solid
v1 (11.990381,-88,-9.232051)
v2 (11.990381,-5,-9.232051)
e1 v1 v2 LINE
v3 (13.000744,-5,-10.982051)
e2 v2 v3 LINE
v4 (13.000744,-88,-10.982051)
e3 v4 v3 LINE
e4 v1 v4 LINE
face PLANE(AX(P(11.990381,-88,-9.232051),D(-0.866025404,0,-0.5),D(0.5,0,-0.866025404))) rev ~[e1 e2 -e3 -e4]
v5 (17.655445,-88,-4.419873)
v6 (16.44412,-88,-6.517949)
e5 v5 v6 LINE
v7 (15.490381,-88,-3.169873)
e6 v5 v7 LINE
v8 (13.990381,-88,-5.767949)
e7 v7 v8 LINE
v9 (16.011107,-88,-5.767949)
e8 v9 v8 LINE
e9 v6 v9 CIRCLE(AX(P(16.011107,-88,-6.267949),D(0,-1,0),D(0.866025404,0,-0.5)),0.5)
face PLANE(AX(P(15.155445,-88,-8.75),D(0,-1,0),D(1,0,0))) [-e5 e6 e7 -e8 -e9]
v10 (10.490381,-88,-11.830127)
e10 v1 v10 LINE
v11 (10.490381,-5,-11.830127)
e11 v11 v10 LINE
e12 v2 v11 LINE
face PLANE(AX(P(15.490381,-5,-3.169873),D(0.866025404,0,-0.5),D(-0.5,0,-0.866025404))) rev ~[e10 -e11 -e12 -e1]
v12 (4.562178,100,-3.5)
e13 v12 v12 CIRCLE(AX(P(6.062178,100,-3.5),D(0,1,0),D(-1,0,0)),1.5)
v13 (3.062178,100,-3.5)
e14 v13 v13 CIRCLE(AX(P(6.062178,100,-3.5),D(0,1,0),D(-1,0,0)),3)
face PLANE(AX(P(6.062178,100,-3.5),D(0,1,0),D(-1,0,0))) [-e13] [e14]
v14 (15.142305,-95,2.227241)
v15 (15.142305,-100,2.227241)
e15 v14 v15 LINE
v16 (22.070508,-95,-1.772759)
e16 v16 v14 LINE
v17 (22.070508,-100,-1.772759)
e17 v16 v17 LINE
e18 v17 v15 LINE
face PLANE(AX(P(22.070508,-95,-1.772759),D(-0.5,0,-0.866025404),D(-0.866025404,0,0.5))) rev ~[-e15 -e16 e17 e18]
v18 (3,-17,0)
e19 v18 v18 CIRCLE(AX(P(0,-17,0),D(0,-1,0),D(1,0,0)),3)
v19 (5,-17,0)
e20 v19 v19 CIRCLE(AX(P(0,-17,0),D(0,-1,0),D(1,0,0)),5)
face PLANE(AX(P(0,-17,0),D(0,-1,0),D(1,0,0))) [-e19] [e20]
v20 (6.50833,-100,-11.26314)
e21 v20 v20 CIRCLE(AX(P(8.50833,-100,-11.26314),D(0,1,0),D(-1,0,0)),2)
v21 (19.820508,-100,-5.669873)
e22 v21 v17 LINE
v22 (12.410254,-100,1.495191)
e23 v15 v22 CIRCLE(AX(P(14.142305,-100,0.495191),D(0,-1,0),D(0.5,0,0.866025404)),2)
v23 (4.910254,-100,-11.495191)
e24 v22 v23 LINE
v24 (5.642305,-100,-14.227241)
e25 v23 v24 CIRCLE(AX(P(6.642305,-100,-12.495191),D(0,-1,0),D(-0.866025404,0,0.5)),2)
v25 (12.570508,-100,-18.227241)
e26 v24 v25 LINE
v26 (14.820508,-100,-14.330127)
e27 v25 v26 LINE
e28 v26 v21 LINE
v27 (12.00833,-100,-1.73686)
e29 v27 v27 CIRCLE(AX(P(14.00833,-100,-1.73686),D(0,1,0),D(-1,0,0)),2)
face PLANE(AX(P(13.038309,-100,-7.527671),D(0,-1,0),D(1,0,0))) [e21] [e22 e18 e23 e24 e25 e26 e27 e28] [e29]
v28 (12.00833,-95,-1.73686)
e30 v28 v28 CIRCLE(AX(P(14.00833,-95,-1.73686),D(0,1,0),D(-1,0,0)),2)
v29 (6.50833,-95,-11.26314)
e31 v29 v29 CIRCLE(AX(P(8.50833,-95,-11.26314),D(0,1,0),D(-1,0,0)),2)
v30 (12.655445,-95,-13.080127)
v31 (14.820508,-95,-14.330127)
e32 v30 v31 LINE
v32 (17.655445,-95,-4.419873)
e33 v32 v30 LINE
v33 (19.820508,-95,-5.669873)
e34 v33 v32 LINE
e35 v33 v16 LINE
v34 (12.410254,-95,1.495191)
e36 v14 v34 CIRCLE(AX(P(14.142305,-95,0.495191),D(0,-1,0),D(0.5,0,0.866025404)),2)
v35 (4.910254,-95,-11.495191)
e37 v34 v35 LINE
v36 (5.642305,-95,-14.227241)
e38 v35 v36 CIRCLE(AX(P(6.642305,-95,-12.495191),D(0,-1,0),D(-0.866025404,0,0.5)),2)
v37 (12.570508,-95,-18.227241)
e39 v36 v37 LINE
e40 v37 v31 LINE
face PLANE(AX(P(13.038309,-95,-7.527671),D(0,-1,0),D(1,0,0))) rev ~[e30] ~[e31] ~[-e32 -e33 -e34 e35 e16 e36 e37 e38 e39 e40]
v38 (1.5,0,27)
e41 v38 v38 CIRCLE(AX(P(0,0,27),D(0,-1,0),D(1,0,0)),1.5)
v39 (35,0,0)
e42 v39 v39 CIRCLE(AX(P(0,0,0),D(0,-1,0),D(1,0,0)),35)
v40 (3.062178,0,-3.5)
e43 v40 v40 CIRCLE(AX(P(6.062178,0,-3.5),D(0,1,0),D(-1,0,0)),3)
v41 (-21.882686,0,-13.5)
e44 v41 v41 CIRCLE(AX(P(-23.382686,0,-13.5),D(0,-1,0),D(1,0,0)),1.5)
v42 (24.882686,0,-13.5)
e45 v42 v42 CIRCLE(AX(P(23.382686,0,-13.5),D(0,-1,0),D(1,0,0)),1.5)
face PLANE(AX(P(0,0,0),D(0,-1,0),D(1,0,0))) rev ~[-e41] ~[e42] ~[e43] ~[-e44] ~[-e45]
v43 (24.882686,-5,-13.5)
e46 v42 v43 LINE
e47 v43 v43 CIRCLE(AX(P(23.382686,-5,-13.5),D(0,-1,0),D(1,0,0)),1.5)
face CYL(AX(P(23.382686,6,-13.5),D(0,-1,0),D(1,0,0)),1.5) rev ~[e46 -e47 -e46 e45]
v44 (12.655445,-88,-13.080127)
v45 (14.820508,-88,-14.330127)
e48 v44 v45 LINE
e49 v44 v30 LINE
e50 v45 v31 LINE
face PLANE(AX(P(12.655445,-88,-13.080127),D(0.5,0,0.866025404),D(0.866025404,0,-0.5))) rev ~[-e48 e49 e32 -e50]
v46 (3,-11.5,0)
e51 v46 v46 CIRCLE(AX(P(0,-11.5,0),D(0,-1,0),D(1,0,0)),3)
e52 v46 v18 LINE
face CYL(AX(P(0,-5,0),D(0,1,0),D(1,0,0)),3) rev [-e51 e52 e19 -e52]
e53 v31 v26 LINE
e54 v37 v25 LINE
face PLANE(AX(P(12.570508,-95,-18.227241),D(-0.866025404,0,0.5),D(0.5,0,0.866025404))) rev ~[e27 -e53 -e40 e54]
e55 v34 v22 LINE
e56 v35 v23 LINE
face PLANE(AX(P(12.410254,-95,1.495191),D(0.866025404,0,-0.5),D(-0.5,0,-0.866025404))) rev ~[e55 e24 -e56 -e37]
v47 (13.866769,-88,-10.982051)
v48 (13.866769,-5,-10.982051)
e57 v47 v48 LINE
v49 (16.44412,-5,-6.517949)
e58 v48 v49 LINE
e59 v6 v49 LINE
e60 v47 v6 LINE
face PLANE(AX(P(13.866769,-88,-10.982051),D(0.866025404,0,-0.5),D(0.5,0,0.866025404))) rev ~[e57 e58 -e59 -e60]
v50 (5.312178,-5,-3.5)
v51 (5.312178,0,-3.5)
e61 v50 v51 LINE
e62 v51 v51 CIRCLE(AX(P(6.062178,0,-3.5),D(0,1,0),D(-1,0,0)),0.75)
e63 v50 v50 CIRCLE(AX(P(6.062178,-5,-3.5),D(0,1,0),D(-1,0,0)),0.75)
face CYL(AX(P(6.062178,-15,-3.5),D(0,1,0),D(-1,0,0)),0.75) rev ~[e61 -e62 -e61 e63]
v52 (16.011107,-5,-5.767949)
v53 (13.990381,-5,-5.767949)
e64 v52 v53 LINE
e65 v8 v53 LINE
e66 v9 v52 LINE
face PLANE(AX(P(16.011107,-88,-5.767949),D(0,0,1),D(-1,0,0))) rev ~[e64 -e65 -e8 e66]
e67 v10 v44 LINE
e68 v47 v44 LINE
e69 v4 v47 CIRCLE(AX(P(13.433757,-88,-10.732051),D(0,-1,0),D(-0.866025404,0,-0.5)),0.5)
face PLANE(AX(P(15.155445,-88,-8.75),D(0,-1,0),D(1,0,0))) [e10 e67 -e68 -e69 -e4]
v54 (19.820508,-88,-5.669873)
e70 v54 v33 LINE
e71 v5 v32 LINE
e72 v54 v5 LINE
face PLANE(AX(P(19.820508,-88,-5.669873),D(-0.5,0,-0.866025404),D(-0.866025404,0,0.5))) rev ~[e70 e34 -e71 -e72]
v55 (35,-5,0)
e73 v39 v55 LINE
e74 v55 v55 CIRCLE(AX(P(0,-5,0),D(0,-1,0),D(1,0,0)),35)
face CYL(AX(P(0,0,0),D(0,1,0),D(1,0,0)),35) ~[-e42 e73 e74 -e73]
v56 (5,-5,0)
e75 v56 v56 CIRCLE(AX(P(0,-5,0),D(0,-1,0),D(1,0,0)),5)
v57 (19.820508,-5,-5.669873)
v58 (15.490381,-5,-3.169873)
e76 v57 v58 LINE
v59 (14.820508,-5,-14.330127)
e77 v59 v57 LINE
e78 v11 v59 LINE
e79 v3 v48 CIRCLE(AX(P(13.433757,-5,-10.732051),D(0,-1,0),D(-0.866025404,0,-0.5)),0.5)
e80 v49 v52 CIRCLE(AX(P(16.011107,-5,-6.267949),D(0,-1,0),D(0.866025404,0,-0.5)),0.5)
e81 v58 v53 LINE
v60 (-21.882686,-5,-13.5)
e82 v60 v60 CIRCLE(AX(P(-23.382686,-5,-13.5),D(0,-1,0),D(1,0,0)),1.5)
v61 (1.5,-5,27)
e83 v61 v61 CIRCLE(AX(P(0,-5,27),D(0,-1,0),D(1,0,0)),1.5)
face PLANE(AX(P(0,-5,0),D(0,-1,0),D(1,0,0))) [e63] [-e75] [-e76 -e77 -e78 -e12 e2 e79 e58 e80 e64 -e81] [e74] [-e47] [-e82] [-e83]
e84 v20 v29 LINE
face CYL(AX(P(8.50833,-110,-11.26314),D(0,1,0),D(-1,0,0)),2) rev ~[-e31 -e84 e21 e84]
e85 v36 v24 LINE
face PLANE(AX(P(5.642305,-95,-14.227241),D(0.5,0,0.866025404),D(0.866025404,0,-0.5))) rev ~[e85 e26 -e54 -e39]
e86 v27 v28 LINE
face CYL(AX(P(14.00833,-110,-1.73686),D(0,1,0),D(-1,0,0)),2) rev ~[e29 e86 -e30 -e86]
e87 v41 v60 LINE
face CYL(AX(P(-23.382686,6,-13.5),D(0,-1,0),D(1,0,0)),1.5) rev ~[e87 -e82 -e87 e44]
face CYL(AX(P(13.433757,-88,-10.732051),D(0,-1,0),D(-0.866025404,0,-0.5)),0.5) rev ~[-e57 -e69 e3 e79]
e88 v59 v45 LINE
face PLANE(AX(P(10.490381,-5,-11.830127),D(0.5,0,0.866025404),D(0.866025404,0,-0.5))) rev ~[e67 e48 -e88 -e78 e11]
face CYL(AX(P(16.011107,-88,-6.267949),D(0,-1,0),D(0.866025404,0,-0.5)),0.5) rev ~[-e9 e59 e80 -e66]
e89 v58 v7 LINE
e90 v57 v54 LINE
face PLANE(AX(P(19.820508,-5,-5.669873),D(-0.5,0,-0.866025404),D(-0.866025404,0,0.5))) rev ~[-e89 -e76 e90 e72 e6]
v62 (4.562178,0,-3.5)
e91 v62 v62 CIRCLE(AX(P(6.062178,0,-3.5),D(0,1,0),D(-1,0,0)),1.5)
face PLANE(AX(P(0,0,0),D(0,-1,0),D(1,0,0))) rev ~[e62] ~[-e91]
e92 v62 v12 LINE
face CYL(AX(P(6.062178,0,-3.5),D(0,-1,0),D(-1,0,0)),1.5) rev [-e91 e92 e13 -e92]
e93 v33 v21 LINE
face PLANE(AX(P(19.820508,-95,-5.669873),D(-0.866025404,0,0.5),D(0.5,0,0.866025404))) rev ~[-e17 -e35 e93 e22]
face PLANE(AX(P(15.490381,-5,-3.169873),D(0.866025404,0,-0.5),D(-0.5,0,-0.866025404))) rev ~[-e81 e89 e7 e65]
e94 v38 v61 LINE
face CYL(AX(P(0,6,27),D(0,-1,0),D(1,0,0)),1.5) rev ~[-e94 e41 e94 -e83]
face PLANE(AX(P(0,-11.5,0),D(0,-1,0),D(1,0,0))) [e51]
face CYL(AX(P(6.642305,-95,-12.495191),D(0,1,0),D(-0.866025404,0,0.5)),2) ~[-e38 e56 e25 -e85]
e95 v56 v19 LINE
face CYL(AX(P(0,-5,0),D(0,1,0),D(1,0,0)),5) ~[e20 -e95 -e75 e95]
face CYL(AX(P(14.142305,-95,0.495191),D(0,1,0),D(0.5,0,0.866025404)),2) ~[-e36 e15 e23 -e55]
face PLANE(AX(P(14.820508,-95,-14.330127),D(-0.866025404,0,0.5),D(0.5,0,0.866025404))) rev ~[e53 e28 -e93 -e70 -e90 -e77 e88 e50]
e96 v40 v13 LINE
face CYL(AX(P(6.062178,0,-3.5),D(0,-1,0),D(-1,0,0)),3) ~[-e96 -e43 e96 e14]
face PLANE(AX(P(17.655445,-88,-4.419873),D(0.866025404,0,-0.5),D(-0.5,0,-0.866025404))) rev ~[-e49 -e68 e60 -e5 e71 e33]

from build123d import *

# Parameters (mm, degrees)
F0_R      = 35
F1_DEPTH  = 5
F2_R      = 5
F2_R_2    = 3
F3_DEPTH  = 12
F5_DEPTH  = 83
F7_D      = 3
F7_DEPTH  = 6
F7_TIP    = 0.9012909285
F9_DEPTH  = 83
F10_R     = 3
F11_DEPTH = 6.5
F13_DEPTH = 7
F15_DEPTH = 5
F17_D     = 4
F17_DEPTH = 10
F17_TIP   = 1.2017212381
F19_D     = 1.5
F19_DEPTH = 10
F19_TIP   = 0.4506454643
F20_R     = 3
F20_R_2   = 1.5
F21_DEPTH = 100


# Not quite as in the source:
# - a feature names something its author has since deleted; it is built from what else it names


with BuildPart() as f1:
    # F0 (on Front) → F1 (new body)
    with BuildSketch(Plane.XZ):
        Circle(F0_R)
    extrude(amount=F1_DEPTH)

    # F2 (on face) → F3 (join)
    with BuildSketch(Plane.XZ.offset(5)):
        Circle(F2_R)
        Circle(F2_R_2, mode=Mode.SUBTRACT)
    extrude(amount=F3_DEPTH)

    # F4 (on face) → F5 (join)
    with BuildSketch(Plane.XZ.offset(5)):
        Polygon((14.8205080757, -14.3301270189), (19.8205080757, -5.6698729811), (15.4903810568, -3.1698729811), (10.4903810568, -11.8301270189), align=None)
    extrude(amount=F5_DEPTH)

    # F7
    with Locations(Plane(origin=(0, 0, 0), x_dir=(-1, 0, 0), z_dir=(0, 1, 0))):
        with Locations((0, 27), (-23.3826859022, -13.5), (23.3826859022, -13.5)):
            Hole(F7_D / 2, depth=F7_DEPTH)
            with Locations((0, 0, -(F7_DEPTH + F7_TIP / 2))):  # 118° drill point
                Cone(0, F7_D / 2, F7_TIP, mode=Mode.SUBTRACT)

    # F8 (on face) → F9 (cut, through all)
    with BuildSketch(Plane.XZ.offset(88)):
        with BuildLine():
            Line((13.9903810568, -5.7679491924), (11.9903810568, -9.2320508076))
            Line((11.9903810568, -9.2320508076), (13.0007440278, -10.9820508076))
            ThreePointArc((13.0007440278, -10.9820508076), (13.4337567297, -11.2320508076), (13.8667694316, -10.9820508076))
            Line((13.8667694316, -10.9820508076), (16.4441197008, -6.5179491924))
            ThreePointArc((16.4441197008, -6.5179491924), (16.4441197008, -6.0179491924), (16.0111069989, -5.7679491924))
            Line((16.0111069989, -5.7679491924), (13.9903810568, -5.7679491924))
        make_face()
    extrude(amount=-F9_DEPTH, mode=Mode.SUBTRACT)

    # F10 (on face) → F11 (join)
    with BuildSketch(Plane.XZ.offset(5)):
        Circle(F10_R)
    extrude(amount=F11_DEPTH)

    # F12 (on face) → F13 (join)
    with BuildSketch(Plane.XZ.offset(88)):
        Polygon((12.6554445662, -13.0801270189), (14.8205080757, -14.3301270189), (19.8205080757, -5.6698729811), (17.6554445662, -4.4198729811), align=None)
    extrude(amount=F13_DEPTH)

    # F14 (on face) → F15 (join)
    with BuildSketch(Plane.XZ.offset(95)):
        with BuildLine():
            Line((5.6423048454, -14.227241336), (12.5705080757, -18.227241336))
            Line((12.5705080757, -18.227241336), (14.8205080757, -14.3301270189))
            Line((14.8205080757, -14.3301270189), (12.6554445662, -13.0801270189))
            Line((12.6554445662, -13.0801270189), (17.6554445662, -4.4198729811))
            Line((17.6554445662, -4.4198729811), (19.8205080757, -5.6698729811))
            Line((19.8205080757, -5.6698729811), (22.0705080757, -1.772758664))
            Line((22.0705080757, -1.772758664), (15.1423048454, 2.227241336))
            ThreePointArc((15.1423048454, 2.227241336), (13.6246667552, 2.427042181), (12.4102540378, 1.4951905284))
            Line((12.4102540378, 1.4951905284), (4.9102540378, -11.4951905284))
            ThreePointArc((4.9102540378, -11.4951905284), (4.7104531928, -13.0128286186), (5.6423048454, -14.227241336))
        make_face()
        Polygon((12.6554445662, -13.0801270189), (14.8205080757, -14.3301270189), (19.8205080757, -5.6698729811), (17.6554445662, -4.4198729811), align=None)
    extrude(amount=F15_DEPTH)

    # F17
    with Locations(Plane.XZ.offset(100)):
        with Locations((14.0083302492, -1.7368602792), (8.5083302492, -11.2631397208)):
            Hole(F17_D / 2, depth=F17_DEPTH)
            with Locations((0, 0, -(F17_DEPTH + F17_TIP / 2))):  # 118° drill point
                Cone(0, F17_D / 2, F17_TIP, mode=Mode.SUBTRACT)

    # F19
    with Locations(Plane.XZ.offset(5)):
        with Locations((6.0621778265, -3.5)):
            Hole(F19_D / 2, depth=F19_DEPTH)
            with Locations((0, 0, -(F19_DEPTH + F19_TIP / 2))):  # 118° drill point
                Cone(0, F19_D / 2, F19_TIP, mode=Mode.SUBTRACT)

    # F20 (on face) → F21 (join)
    with BuildSketch(Plane(origin=(0, 0, 0), x_dir=(-1, 0, 0), z_dir=(0, 1, 0))):
        with Locations((-6.0621778265, -3.5)):
            Circle(F20_R)
        with Locations((-6.0621778265, -3.5)):
            Circle(F20_R_2, mode=Mode.SUBTRACT)
    extrude(amount=F21_DEPTH)


solid = f1.part
